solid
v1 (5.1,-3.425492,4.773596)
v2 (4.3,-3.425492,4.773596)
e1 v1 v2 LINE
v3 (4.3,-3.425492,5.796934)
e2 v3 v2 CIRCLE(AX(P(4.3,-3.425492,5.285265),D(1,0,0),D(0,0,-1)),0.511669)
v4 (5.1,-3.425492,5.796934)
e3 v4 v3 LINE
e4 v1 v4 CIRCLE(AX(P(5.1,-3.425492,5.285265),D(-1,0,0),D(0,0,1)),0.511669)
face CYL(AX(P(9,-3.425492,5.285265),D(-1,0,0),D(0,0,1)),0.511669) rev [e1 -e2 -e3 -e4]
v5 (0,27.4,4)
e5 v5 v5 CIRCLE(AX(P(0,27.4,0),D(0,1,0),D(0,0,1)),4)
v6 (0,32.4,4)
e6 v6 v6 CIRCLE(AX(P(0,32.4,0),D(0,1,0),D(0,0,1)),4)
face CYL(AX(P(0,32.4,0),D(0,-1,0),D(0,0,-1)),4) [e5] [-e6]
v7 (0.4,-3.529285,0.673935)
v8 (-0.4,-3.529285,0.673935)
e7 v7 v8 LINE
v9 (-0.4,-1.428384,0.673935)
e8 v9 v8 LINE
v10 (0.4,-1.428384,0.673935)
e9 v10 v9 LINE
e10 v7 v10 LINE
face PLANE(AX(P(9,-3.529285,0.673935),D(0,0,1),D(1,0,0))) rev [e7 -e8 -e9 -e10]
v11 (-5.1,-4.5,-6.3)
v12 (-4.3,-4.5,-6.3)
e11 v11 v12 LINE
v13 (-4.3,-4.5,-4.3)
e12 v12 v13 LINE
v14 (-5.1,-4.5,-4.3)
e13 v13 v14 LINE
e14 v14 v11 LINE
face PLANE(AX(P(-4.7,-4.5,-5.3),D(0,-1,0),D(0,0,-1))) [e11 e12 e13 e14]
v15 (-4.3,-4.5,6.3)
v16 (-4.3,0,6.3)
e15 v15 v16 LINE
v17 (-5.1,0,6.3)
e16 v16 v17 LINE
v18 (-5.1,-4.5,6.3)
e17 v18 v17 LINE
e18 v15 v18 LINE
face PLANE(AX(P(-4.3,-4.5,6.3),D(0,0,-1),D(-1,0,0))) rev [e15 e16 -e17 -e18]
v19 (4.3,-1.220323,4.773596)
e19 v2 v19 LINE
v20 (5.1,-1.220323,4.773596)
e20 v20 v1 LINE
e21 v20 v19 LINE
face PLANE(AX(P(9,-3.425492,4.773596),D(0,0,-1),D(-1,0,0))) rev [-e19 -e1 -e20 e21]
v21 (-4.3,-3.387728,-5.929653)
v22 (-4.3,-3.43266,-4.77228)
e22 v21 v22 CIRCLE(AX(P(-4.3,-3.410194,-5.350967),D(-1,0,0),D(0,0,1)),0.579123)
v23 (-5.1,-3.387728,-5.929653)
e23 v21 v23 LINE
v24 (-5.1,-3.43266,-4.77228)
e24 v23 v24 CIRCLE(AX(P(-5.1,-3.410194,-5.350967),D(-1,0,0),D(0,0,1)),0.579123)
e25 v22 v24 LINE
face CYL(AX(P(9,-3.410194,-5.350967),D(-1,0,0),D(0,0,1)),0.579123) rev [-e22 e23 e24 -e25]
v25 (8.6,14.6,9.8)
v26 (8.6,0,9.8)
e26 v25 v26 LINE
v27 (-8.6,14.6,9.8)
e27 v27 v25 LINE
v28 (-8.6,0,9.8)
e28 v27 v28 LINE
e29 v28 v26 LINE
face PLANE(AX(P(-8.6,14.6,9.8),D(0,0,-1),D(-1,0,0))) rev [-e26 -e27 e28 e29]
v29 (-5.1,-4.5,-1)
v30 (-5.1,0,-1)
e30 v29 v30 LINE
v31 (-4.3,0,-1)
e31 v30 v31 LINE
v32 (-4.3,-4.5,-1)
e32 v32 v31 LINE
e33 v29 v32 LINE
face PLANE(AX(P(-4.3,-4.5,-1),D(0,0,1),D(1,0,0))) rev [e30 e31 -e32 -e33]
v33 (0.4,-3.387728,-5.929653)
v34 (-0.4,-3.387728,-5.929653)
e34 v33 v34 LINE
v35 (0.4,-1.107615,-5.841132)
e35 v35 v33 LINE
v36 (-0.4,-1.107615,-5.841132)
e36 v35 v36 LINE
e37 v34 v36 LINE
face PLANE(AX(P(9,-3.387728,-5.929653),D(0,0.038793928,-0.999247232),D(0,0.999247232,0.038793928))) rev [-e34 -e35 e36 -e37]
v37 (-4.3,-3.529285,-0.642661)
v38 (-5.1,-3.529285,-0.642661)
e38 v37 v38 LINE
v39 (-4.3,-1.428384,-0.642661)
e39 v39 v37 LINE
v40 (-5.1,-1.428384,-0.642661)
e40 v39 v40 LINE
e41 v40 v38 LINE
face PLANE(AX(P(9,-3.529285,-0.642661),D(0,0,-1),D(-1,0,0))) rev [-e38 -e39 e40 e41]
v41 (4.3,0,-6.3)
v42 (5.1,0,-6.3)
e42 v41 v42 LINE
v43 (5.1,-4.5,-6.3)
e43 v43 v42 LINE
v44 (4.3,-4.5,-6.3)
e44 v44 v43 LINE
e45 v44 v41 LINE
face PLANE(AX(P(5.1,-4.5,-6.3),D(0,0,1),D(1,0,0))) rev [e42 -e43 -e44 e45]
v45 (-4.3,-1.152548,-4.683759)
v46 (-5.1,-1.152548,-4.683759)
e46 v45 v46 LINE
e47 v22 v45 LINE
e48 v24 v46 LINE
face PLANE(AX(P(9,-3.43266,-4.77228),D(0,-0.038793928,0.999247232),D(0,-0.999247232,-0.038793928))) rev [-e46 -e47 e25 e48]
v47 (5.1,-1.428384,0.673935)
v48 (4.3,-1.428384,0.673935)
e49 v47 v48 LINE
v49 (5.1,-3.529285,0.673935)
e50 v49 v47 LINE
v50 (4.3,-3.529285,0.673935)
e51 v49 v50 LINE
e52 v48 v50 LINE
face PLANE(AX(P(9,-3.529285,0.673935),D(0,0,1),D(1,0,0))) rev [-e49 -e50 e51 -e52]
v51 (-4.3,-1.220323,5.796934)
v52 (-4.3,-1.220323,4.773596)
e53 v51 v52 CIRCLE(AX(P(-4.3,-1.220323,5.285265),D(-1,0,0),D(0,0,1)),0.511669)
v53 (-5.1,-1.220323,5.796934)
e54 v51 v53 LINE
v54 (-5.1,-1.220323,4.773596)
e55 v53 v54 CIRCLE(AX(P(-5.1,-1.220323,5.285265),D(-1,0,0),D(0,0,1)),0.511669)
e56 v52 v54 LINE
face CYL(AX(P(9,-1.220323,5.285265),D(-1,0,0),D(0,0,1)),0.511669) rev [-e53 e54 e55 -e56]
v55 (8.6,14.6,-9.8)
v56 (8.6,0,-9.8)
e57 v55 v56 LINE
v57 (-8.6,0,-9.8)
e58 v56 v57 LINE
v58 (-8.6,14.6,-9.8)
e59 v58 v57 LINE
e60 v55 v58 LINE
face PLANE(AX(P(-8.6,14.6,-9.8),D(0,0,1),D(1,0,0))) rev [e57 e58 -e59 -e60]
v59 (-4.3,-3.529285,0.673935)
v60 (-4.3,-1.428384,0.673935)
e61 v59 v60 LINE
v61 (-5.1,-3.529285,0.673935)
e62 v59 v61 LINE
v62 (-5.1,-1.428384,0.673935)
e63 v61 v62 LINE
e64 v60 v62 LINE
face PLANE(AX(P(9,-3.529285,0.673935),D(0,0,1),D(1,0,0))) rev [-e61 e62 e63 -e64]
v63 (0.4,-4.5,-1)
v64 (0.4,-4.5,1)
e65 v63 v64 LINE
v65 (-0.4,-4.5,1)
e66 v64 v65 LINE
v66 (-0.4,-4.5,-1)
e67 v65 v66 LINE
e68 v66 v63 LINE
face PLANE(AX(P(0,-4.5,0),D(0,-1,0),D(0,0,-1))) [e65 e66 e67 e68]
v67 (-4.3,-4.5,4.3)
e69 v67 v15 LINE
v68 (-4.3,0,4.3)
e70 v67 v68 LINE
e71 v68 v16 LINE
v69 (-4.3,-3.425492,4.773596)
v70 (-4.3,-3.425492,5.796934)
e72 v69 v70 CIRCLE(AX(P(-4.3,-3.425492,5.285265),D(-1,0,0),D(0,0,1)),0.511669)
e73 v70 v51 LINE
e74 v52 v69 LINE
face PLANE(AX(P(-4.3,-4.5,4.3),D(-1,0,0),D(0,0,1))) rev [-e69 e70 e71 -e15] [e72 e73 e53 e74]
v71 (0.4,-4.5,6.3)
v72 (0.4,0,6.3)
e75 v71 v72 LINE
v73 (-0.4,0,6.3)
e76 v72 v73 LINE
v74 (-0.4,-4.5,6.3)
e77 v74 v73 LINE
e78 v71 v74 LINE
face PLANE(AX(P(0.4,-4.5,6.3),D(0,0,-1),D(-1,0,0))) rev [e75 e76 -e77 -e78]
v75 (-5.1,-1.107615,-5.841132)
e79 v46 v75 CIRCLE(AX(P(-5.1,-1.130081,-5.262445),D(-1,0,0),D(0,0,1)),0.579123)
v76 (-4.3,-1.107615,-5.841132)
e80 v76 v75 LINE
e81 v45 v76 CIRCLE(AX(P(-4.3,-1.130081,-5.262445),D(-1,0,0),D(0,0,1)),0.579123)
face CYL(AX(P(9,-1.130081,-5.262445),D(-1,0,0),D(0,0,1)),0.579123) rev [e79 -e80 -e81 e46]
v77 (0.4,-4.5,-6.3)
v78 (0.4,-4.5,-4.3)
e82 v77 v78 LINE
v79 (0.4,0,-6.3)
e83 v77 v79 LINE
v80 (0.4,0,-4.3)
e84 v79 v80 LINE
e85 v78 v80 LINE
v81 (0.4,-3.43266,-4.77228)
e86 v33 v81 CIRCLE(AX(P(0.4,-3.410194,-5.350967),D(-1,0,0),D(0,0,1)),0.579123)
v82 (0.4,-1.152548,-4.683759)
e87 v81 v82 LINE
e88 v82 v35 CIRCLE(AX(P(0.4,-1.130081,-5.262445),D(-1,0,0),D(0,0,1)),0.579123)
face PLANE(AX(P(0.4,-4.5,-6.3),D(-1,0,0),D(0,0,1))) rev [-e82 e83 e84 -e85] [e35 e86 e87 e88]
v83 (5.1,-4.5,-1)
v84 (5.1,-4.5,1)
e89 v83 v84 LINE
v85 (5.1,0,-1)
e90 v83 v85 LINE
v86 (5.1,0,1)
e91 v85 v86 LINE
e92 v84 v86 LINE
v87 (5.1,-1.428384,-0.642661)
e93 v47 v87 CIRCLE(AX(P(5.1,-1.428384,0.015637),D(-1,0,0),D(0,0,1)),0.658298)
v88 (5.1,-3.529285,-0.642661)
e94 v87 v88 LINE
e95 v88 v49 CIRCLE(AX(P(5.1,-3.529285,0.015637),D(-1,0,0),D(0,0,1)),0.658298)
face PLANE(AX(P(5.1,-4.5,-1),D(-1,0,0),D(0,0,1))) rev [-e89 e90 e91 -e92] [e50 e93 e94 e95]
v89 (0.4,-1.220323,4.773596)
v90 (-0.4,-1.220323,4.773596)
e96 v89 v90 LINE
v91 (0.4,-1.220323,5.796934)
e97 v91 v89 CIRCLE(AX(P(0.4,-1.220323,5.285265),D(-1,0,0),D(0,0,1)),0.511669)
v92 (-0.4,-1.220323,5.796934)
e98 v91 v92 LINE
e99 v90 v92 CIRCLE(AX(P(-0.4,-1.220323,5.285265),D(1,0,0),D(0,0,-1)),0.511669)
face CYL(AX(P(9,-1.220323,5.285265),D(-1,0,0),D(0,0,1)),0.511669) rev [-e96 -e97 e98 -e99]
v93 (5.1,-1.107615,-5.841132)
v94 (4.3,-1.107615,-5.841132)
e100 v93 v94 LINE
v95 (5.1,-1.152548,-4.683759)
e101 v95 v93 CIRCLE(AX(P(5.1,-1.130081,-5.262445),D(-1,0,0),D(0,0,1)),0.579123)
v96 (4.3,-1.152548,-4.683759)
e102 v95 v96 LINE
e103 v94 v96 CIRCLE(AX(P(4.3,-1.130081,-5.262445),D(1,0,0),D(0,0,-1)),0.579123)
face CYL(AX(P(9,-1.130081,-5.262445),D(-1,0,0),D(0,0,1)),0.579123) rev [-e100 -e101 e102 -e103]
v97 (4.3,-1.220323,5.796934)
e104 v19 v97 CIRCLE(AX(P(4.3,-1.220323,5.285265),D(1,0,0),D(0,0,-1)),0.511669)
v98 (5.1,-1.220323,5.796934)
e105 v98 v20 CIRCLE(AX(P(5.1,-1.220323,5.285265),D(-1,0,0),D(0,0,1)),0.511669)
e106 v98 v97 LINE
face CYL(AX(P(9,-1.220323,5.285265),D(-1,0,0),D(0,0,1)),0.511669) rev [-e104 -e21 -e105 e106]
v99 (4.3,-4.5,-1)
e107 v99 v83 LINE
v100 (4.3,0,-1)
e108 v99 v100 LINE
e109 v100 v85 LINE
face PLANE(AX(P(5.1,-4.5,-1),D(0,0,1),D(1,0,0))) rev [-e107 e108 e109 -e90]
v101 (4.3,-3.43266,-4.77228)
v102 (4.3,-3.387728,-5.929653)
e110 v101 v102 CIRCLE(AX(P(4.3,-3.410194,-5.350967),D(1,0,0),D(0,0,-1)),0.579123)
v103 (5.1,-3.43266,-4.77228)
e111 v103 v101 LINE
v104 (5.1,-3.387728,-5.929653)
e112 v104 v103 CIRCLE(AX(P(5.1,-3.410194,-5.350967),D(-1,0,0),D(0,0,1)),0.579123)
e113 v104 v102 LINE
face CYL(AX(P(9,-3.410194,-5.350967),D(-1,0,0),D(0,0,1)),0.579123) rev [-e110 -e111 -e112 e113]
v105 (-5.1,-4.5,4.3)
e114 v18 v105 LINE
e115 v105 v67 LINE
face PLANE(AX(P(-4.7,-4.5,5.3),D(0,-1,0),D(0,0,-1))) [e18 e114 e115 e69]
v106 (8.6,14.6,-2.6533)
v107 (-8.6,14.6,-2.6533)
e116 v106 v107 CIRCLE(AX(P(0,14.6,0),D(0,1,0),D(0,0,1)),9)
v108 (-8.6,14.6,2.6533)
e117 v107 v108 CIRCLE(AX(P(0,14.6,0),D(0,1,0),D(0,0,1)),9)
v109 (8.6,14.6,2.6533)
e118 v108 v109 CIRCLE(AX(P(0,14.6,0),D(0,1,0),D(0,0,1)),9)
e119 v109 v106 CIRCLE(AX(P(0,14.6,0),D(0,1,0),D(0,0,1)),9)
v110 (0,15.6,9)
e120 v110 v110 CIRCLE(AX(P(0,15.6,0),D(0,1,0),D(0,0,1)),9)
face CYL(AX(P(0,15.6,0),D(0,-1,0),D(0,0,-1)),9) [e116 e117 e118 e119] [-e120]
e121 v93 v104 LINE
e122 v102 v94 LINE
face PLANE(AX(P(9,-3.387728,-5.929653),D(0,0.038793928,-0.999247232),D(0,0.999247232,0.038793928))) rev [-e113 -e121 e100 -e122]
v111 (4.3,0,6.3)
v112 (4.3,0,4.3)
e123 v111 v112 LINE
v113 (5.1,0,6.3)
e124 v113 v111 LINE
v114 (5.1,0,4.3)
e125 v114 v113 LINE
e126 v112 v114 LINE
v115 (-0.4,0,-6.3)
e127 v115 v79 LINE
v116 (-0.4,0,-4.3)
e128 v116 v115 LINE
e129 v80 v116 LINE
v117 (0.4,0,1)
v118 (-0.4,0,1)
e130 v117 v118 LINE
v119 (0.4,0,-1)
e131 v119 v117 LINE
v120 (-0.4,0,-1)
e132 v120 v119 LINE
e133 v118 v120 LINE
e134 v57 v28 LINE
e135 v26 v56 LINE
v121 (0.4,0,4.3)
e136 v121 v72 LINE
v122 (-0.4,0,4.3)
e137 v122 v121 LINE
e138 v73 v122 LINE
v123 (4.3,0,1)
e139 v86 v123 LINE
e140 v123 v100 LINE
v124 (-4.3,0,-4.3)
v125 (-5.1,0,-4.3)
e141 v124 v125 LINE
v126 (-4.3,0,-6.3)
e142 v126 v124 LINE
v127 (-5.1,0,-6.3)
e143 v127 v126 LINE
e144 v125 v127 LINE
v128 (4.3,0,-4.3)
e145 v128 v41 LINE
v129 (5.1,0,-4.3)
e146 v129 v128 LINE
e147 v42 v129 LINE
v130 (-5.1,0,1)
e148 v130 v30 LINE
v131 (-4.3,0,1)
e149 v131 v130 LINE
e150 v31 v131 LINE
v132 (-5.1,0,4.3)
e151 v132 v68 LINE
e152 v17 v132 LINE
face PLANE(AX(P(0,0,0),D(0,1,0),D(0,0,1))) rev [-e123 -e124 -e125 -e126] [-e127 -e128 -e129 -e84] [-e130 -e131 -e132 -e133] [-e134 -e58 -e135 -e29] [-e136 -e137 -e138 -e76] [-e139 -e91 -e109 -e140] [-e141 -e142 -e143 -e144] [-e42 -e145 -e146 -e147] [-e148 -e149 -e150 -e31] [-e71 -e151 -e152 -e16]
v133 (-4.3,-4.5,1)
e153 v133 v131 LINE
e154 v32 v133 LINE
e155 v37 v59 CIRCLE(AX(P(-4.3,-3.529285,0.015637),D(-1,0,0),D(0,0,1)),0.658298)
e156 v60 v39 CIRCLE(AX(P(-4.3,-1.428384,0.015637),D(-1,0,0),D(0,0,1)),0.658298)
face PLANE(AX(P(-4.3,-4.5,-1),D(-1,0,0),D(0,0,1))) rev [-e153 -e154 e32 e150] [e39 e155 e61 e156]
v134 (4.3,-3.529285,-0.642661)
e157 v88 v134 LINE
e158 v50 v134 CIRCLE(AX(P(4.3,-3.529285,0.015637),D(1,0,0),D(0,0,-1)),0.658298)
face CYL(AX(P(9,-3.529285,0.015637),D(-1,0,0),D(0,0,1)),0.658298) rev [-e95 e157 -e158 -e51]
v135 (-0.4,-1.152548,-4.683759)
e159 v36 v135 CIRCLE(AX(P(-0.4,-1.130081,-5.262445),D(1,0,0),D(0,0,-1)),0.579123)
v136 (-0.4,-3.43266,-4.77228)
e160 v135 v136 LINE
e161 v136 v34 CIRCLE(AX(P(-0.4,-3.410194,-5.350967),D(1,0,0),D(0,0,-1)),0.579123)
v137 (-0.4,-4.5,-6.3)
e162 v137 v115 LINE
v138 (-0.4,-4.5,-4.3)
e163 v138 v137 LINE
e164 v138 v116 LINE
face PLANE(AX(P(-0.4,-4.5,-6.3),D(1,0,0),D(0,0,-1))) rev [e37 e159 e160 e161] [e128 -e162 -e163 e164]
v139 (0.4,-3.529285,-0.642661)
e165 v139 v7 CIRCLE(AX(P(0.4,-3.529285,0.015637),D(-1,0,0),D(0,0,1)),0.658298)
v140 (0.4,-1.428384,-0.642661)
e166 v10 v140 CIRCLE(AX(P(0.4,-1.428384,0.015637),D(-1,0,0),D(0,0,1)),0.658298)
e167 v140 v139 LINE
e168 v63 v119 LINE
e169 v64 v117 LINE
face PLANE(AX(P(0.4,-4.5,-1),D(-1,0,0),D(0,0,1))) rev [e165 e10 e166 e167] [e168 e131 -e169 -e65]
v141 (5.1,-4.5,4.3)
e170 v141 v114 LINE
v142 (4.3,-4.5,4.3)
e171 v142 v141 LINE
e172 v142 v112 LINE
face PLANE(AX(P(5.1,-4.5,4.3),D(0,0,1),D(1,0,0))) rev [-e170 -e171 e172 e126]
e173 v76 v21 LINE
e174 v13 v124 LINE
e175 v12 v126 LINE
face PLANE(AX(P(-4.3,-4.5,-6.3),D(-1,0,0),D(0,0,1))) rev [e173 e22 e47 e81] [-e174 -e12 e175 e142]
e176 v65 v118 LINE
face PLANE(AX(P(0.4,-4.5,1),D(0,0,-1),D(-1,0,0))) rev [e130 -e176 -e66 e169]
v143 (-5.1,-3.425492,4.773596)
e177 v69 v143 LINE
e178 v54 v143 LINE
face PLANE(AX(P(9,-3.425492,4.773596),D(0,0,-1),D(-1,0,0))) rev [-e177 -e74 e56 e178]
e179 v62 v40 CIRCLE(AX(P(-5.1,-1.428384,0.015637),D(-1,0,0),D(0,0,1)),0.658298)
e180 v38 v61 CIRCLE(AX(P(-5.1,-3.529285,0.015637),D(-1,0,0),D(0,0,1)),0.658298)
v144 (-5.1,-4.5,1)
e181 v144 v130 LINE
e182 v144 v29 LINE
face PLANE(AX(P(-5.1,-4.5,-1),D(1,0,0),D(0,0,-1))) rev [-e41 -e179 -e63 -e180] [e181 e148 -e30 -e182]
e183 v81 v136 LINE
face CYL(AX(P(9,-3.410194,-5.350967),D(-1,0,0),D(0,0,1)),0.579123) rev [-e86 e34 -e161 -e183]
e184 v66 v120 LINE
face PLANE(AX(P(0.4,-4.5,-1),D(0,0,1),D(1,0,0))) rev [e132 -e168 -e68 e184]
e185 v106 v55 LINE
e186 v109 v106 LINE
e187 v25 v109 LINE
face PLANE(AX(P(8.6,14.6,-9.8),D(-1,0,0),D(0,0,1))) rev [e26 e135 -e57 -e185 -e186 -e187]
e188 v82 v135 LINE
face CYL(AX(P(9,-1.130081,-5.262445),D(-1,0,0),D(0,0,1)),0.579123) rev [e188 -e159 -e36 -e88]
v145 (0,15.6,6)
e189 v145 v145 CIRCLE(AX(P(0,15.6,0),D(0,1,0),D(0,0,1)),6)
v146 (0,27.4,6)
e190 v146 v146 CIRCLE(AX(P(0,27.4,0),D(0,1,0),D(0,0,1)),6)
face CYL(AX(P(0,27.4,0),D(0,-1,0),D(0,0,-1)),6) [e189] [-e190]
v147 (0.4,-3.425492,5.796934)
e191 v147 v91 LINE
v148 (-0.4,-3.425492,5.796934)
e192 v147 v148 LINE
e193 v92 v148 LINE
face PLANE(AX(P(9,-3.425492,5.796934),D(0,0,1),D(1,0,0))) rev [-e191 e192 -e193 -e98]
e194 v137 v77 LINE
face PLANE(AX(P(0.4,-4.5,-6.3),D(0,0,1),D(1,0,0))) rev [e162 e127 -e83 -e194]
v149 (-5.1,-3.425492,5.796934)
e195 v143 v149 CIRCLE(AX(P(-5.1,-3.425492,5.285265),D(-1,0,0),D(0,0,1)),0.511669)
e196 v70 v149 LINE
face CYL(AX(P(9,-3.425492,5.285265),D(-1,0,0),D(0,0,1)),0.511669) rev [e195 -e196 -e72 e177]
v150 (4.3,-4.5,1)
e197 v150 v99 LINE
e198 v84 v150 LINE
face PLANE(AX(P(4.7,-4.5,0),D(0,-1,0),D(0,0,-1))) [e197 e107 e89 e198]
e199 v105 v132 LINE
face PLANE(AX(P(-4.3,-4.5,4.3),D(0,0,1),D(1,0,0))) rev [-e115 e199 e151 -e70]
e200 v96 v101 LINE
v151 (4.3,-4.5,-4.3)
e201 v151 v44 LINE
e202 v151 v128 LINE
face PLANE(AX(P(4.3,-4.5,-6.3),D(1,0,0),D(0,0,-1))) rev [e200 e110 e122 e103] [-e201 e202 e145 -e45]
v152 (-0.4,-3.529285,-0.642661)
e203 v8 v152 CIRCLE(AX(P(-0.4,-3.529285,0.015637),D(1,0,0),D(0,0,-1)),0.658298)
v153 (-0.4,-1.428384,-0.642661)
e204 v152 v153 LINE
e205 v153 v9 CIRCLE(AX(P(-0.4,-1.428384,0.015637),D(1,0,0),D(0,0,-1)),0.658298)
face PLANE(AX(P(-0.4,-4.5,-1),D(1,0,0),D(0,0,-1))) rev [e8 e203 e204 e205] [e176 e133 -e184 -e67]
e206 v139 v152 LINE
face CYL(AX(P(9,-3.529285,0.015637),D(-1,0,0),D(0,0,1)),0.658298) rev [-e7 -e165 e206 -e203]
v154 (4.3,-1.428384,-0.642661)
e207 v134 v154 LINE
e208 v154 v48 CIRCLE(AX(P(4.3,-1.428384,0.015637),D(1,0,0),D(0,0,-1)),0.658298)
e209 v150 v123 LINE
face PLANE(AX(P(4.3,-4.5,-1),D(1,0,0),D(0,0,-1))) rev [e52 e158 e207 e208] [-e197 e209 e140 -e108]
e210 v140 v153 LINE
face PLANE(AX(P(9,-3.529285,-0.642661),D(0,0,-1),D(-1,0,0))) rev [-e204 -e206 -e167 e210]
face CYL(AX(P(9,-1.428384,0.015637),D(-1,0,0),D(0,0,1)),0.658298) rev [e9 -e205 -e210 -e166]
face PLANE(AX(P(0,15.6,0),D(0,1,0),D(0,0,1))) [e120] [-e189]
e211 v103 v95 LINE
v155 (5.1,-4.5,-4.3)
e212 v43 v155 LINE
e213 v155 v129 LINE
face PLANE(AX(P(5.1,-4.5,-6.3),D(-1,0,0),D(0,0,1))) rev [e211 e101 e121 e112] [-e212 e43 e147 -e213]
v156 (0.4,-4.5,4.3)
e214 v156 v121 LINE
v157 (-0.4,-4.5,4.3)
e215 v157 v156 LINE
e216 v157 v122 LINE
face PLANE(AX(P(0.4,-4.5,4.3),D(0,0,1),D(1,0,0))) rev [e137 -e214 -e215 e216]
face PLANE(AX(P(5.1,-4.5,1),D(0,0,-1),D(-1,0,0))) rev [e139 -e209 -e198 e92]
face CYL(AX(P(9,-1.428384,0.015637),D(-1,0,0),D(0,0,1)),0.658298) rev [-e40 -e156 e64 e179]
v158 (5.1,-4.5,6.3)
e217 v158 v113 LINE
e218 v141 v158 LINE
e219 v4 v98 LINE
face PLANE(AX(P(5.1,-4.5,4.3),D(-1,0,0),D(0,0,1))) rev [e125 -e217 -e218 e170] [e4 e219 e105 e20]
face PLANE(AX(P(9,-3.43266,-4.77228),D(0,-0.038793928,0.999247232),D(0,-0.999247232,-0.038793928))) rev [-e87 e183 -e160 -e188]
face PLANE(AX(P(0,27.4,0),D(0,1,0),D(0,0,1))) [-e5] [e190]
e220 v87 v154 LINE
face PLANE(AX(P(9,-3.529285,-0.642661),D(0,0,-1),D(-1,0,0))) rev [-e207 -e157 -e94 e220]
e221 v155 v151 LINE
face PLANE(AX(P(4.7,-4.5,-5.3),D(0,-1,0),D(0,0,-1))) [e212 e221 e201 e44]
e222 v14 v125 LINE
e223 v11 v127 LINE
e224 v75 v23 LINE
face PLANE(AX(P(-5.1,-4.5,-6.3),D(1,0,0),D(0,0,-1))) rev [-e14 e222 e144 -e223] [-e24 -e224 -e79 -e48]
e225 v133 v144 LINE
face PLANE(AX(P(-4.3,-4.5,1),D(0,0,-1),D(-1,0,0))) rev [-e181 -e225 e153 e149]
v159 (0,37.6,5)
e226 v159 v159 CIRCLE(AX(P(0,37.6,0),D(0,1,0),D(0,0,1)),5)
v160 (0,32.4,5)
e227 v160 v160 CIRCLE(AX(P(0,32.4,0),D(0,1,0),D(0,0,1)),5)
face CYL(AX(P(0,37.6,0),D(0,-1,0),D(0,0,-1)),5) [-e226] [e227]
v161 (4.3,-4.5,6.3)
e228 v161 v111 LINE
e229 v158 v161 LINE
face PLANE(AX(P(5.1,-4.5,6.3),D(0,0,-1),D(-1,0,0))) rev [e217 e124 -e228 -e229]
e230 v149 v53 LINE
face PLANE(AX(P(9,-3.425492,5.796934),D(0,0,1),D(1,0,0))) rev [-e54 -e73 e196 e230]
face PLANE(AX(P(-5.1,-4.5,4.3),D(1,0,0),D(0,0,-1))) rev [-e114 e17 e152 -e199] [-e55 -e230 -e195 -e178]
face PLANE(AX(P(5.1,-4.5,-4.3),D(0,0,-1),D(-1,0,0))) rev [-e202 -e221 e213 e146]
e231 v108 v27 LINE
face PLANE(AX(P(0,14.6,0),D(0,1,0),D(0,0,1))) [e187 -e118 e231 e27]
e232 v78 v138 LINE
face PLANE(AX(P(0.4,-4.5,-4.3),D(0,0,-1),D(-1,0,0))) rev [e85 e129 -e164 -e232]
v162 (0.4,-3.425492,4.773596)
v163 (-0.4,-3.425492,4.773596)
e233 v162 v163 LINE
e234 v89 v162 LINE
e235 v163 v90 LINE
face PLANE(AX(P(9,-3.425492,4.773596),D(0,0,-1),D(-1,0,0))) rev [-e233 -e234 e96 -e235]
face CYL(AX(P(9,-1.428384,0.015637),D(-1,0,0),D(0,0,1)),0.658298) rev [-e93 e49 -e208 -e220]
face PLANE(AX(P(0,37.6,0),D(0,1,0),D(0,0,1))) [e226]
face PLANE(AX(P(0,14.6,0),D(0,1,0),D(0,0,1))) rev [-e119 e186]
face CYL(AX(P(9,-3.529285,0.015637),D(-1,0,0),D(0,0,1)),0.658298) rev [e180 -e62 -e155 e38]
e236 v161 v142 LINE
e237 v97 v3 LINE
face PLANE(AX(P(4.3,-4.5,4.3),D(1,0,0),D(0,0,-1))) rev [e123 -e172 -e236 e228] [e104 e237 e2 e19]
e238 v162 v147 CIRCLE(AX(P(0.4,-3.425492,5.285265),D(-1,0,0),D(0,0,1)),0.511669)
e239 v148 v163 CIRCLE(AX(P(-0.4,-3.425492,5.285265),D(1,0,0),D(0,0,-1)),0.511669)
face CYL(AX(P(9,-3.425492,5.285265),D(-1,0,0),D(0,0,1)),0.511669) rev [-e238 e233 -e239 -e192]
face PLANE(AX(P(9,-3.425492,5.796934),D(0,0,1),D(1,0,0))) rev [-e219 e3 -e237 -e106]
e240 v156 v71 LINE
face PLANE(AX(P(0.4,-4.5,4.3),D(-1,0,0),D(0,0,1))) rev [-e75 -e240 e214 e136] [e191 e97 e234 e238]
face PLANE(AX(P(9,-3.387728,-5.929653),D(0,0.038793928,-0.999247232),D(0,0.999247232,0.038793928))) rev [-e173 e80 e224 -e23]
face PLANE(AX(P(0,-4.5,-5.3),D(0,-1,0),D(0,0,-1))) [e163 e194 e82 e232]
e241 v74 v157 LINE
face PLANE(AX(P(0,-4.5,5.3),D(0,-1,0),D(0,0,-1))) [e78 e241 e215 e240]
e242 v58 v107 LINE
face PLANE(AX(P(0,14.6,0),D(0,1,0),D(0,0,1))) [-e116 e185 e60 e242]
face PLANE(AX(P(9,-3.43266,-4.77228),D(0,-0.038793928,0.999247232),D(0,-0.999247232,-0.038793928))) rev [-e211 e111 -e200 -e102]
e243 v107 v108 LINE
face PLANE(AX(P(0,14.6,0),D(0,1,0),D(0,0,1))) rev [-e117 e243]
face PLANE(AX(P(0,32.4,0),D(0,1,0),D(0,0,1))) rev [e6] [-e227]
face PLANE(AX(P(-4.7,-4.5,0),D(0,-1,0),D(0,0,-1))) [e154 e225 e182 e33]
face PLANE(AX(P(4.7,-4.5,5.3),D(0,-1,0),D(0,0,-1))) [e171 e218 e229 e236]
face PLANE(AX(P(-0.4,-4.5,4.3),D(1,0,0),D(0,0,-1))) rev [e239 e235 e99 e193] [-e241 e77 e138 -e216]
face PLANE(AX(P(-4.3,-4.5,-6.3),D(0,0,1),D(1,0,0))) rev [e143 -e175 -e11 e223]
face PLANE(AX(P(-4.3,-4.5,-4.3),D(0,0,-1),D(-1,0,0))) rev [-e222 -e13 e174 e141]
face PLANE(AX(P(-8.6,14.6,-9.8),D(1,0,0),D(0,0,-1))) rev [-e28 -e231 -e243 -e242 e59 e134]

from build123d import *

# Parameters (mm, degrees)
SKETCH_1_W                       = 17.2
SKETCH_1_H                       = 19.6
EXTRUDE_1_DEPTH                  = 14.6
SKETCH_2_R                       = 9
EXTRUDE_2_DEPTH                  = 1
SKETCH_3_R                       = 6
EXTRUDE_3_DEPTH                  = 11.8
SKETCH_4_R                       = 4
EXTRUDE_4_DEPTH                  = 5
SKETCH_5_R                       = 5
EXTRUDE_5_DEPTH                  = 5.2
SKETCH_6_W                       = 0.8
SKETCH_6_H                       = 2
EXTRUDE_6_DEPTH                  = 4.5
PATTERN_LINEAR_1_COUNT           = 2
PATTERN_LINEAR_1_PITCH           = 5.3
PATTERN_LINEAR_2_COUNT           = 2
PATTERN_LINEAR_2_PITCH           = 4.7
PATTERN_LINEAR_2_COPY_1_SKETCH_W = 0.8
PATTERN_LINEAR_2_COPY_1_SKETCH_H = 2
PATTERN_LINEAR_2_COPY_1_DEPTH    = 4.5
PATTERN_LINEAR_3_COUNT           = 2
PATTERN_LINEAR_3_PITCH           = 5.3
PATTERN_LINEAR_3_COPY_1_SKETCH_W = 0.8
PATTERN_LINEAR_3_COPY_1_SKETCH_H = 2
PATTERN_LINEAR_3_COPY_1_DEPTH    = 4.5
PATTERN_LINEAR_3_COPY_2_SKETCH_W = 0.8
PATTERN_LINEAR_3_COPY_2_SKETCH_H = 2
PATTERN_LINEAR_3_COPY_2_DEPTH    = 4.5
PATTERN_LINEAR_3_COPY_3_SKETCH_W = 0.8
PATTERN_LINEAR_3_COPY_3_SKETCH_H = 2
PATTERN_LINEAR_3_COPY_3_DEPTH    = 4.5
PATTERN_START                    = -6.3
PATTERN_LINEAR_4_OUTLINE_W       = 0.8
PATTERN_LINEAR_4_OUTLINE_H       = 4.5
PATTERN_LINEAR_4_DEPTH           = 2
PATTERN_START_2                  = -1
PATTERN_LINEAR_4_2_OUTLINE_W     = 0.8
PATTERN_LINEAR_4_2_OUTLINE_H     = 4.5
PATTERN_LINEAR_4_2_DEPTH         = 2
PATTERN_START_3                  = 4.3
PATTERN_LINEAR_4_3_OUTLINE_W     = 0.8
PATTERN_LINEAR_4_3_OUTLINE_H     = 4.5
PATTERN_LINEAR_4_3_DEPTH         = 2
CUT_EXTRUDE_1_DEPTH              = 42.335335973


# Read off the part's stored shape, not the designer's step: 阵列(线性)4
with BuildPart() as part:
    # 草图1 → 凸台-拉伸1 (new body)
    with BuildSketch(Plane(origin=(0, 0, 0), x_dir=(1, 0, 0), z_dir=(0, 1, 0))):
        Rectangle(SKETCH_1_W, SKETCH_1_H)
    extrude(amount=EXTRUDE_1_DEPTH)

    # 草图2 → 凸台-拉伸2 (add)
    with BuildSketch(Plane(origin=(0, 14.6, 0), x_dir=(1, 0, 0), z_dir=(0, 1, 0))):
        with Locations(Location((0, 0, 0), (0, 0, 17.146209999))):
            Circle(SKETCH_2_R)
    extrude(amount=EXTRUDE_2_DEPTH)

    # 草图3 → 凸台-拉伸3 (add)
    with BuildSketch(Plane(origin=(0, 15.6, 0), x_dir=(1, 0, 0), z_dir=(0, 1, 0))):
        with Locations(Location((0, 0, 0), (0, 0, 270))):
            Circle(SKETCH_3_R)
    extrude(amount=EXTRUDE_3_DEPTH)

    # 草图4 → 凸台-拉伸4 (add)
    with BuildSketch(Plane(origin=(0, 27.4, 0), x_dir=(1, 0, 0), z_dir=(0, 1, 0))):
        with Locations(Location((0, 0, 0), (0, 0, 270))):
            Circle(SKETCH_4_R)
    extrude(amount=EXTRUDE_4_DEPTH)

    # 草图5 → 凸台-拉伸5 (add)
    with BuildSketch(Plane(origin=(0, 32.4, 0), x_dir=(1, 0, 0), z_dir=(0, 1, 0))):
        with Locations(Location((0, 0, 0), (0, 0, 270))):
            Circle(SKETCH_5_R)
    extrude(amount=EXTRUDE_5_DEPTH)

    # 草图6 → 凸台-拉伸6 (add)
    with BuildSketch(Plane.XZ):
        Rectangle(SKETCH_6_W, SKETCH_6_H)
    extrude_6 = extrude(amount=EXTRUDE_6_DEPTH)

    # 阵列(线性)1: 凸台-拉伸6 ×2
    with Locations(*[(0, 0, i * PATTERN_LINEAR_1_PITCH) for i in range(1, PATTERN_LINEAR_1_COUNT)]):
        add(extrude_6)

    # 阵列(线性)2: 凸台-拉伸6 ×2
    with Locations(*[(-i * PATTERN_LINEAR_2_PITCH, 0, 0) for i in range(1, PATTERN_LINEAR_2_COUNT)]):
        add(extrude_6)

    # 阵列(线性)2 copy 1 sketch → 阵列(线性)2 copy 1 (add)
    with BuildSketch(Plane(origin=(-4.7, 0, 5.3), x_dir=(1, 0, 0), z_dir=(0, -1, 0))):
        Rectangle(PATTERN_LINEAR_2_COPY_1_SKETCH_W, PATTERN_LINEAR_2_COPY_1_SKETCH_H)
    extrude(amount=PATTERN_LINEAR_2_COPY_1_DEPTH)

    # 阵列(线性)3: 凸台-拉伸6 ×2
    with Locations(*[(0, 0, -i * PATTERN_LINEAR_3_PITCH) for i in range(1, PATTERN_LINEAR_3_COUNT)]):
        add(extrude_6)

    # 阵列(线性)3 copy 1 sketch → 阵列(线性)3 copy 1 (add)
    with BuildSketch(Plane.XZ):
        Rectangle(PATTERN_LINEAR_3_COPY_1_SKETCH_W, PATTERN_LINEAR_3_COPY_1_SKETCH_H)
    extrude(amount=PATTERN_LINEAR_3_COPY_1_DEPTH)

    # 阵列(线性)3 copy 2 sketch → 阵列(线性)3 copy 2 (add)
    with BuildSketch(Plane(origin=(-4.7, 0, -5.3), x_dir=(1, 0, 0), z_dir=(0, -1, 0))):
        Rectangle(PATTERN_LINEAR_3_COPY_2_SKETCH_W, PATTERN_LINEAR_3_COPY_2_SKETCH_H)
    extrude(amount=PATTERN_LINEAR_3_COPY_2_DEPTH)

    # 阵列(线性)3 copy 3 sketch → 阵列(线性)3 copy 3 (add)
    with BuildSketch(Plane(origin=(-4.7, 0, 0), x_dir=(1, 0, 0), z_dir=(0, -1, 0))):
        Rectangle(PATTERN_LINEAR_3_COPY_3_SKETCH_W, PATTERN_LINEAR_3_COPY_3_SKETCH_H)
    extrude(amount=PATTERN_LINEAR_3_COPY_3_DEPTH)

    # 阵列(线性)4 outline → 阵列(线性)4 (add)
    with BuildSketch(Plane.XY.offset(PATTERN_START)):
        with Locations((4.7, -2.25)):
            Rectangle(PATTERN_LINEAR_4_OUTLINE_W, PATTERN_LINEAR_4_OUTLINE_H)
    extrude(amount=PATTERN_LINEAR_4_DEPTH)

    # Pattern Linear 4 2 outline → Pattern Linear 4 2 (add)
    with BuildSketch(Plane.XY.offset(PATTERN_START_2)):
        with Locations((4.7, -2.25)):
            Rectangle(PATTERN_LINEAR_4_2_OUTLINE_W, PATTERN_LINEAR_4_2_OUTLINE_H)
    extrude(amount=PATTERN_LINEAR_4_2_DEPTH)

    # Pattern Linear 4 3 outline → Pattern Linear 4 3 (add)
    with BuildSketch(Plane.XY.offset(PATTERN_START_3)):
        with Locations((4.7, -2.25)):
            Rectangle(PATTERN_LINEAR_4_3_OUTLINE_W, PATTERN_LINEAR_4_3_OUTLINE_H)
    extrude(amount=PATTERN_LINEAR_4_3_DEPTH)

    # 草图7 → 切除-拉伸1 (cut, through all)
    with BuildSketch(Plane.ZY.offset(5.1)):
        with BuildLine():
            Line((-0.642660902, -3.529284683), (-0.642660902, -1.428383643))
            ThreePointArc((-0.642660902, -1.428383643), (0.015637107, -0.770085634), (0.673935116, -1.428383643))
            Line((0.673935116, -1.428383643), (0.673935116, -3.529284683))
            ThreePointArc((0.673935116, -3.529284683), (0.015637107, -4.187582692), (-0.642660902, -3.529284683))
        make_face()
        with BuildLine():
            Line((-5.929653449, -3.387727592), (-5.841132285, -1.107614892))
            ThreePointArc((-5.841132285, -1.107614892), (-5.239978984, -0.551394487), (-4.683758579, -1.152547788))
            Line((-4.683758579, -1.152547788), (-4.772279743, -3.432660488))
            ThreePointArc((-4.772279743, -3.432660488), (-5.373433044, -3.988880894), (-5.929653449, -3.387727592))
        make_face()
        with BuildLine():
            Line((4.773595849, -3.425492164), (4.773595849, -1.220322784))
            ThreePointArc((4.773595849, -1.220322784), (5.285264786, -0.708653848), (5.796933722, -1.220322784))
            Line((5.796933722, -1.220322784), (5.796933722, -3.425492164))
            ThreePointArc((5.796933722, -3.425492164), (5.285264786, -3.937161101), (4.773595849, -3.425492164))
        make_face()
    extrude(amount=-CUT_EXTRUDE_1_DEPTH, mode=Mode.SUBTRACT)


solid = part.part
